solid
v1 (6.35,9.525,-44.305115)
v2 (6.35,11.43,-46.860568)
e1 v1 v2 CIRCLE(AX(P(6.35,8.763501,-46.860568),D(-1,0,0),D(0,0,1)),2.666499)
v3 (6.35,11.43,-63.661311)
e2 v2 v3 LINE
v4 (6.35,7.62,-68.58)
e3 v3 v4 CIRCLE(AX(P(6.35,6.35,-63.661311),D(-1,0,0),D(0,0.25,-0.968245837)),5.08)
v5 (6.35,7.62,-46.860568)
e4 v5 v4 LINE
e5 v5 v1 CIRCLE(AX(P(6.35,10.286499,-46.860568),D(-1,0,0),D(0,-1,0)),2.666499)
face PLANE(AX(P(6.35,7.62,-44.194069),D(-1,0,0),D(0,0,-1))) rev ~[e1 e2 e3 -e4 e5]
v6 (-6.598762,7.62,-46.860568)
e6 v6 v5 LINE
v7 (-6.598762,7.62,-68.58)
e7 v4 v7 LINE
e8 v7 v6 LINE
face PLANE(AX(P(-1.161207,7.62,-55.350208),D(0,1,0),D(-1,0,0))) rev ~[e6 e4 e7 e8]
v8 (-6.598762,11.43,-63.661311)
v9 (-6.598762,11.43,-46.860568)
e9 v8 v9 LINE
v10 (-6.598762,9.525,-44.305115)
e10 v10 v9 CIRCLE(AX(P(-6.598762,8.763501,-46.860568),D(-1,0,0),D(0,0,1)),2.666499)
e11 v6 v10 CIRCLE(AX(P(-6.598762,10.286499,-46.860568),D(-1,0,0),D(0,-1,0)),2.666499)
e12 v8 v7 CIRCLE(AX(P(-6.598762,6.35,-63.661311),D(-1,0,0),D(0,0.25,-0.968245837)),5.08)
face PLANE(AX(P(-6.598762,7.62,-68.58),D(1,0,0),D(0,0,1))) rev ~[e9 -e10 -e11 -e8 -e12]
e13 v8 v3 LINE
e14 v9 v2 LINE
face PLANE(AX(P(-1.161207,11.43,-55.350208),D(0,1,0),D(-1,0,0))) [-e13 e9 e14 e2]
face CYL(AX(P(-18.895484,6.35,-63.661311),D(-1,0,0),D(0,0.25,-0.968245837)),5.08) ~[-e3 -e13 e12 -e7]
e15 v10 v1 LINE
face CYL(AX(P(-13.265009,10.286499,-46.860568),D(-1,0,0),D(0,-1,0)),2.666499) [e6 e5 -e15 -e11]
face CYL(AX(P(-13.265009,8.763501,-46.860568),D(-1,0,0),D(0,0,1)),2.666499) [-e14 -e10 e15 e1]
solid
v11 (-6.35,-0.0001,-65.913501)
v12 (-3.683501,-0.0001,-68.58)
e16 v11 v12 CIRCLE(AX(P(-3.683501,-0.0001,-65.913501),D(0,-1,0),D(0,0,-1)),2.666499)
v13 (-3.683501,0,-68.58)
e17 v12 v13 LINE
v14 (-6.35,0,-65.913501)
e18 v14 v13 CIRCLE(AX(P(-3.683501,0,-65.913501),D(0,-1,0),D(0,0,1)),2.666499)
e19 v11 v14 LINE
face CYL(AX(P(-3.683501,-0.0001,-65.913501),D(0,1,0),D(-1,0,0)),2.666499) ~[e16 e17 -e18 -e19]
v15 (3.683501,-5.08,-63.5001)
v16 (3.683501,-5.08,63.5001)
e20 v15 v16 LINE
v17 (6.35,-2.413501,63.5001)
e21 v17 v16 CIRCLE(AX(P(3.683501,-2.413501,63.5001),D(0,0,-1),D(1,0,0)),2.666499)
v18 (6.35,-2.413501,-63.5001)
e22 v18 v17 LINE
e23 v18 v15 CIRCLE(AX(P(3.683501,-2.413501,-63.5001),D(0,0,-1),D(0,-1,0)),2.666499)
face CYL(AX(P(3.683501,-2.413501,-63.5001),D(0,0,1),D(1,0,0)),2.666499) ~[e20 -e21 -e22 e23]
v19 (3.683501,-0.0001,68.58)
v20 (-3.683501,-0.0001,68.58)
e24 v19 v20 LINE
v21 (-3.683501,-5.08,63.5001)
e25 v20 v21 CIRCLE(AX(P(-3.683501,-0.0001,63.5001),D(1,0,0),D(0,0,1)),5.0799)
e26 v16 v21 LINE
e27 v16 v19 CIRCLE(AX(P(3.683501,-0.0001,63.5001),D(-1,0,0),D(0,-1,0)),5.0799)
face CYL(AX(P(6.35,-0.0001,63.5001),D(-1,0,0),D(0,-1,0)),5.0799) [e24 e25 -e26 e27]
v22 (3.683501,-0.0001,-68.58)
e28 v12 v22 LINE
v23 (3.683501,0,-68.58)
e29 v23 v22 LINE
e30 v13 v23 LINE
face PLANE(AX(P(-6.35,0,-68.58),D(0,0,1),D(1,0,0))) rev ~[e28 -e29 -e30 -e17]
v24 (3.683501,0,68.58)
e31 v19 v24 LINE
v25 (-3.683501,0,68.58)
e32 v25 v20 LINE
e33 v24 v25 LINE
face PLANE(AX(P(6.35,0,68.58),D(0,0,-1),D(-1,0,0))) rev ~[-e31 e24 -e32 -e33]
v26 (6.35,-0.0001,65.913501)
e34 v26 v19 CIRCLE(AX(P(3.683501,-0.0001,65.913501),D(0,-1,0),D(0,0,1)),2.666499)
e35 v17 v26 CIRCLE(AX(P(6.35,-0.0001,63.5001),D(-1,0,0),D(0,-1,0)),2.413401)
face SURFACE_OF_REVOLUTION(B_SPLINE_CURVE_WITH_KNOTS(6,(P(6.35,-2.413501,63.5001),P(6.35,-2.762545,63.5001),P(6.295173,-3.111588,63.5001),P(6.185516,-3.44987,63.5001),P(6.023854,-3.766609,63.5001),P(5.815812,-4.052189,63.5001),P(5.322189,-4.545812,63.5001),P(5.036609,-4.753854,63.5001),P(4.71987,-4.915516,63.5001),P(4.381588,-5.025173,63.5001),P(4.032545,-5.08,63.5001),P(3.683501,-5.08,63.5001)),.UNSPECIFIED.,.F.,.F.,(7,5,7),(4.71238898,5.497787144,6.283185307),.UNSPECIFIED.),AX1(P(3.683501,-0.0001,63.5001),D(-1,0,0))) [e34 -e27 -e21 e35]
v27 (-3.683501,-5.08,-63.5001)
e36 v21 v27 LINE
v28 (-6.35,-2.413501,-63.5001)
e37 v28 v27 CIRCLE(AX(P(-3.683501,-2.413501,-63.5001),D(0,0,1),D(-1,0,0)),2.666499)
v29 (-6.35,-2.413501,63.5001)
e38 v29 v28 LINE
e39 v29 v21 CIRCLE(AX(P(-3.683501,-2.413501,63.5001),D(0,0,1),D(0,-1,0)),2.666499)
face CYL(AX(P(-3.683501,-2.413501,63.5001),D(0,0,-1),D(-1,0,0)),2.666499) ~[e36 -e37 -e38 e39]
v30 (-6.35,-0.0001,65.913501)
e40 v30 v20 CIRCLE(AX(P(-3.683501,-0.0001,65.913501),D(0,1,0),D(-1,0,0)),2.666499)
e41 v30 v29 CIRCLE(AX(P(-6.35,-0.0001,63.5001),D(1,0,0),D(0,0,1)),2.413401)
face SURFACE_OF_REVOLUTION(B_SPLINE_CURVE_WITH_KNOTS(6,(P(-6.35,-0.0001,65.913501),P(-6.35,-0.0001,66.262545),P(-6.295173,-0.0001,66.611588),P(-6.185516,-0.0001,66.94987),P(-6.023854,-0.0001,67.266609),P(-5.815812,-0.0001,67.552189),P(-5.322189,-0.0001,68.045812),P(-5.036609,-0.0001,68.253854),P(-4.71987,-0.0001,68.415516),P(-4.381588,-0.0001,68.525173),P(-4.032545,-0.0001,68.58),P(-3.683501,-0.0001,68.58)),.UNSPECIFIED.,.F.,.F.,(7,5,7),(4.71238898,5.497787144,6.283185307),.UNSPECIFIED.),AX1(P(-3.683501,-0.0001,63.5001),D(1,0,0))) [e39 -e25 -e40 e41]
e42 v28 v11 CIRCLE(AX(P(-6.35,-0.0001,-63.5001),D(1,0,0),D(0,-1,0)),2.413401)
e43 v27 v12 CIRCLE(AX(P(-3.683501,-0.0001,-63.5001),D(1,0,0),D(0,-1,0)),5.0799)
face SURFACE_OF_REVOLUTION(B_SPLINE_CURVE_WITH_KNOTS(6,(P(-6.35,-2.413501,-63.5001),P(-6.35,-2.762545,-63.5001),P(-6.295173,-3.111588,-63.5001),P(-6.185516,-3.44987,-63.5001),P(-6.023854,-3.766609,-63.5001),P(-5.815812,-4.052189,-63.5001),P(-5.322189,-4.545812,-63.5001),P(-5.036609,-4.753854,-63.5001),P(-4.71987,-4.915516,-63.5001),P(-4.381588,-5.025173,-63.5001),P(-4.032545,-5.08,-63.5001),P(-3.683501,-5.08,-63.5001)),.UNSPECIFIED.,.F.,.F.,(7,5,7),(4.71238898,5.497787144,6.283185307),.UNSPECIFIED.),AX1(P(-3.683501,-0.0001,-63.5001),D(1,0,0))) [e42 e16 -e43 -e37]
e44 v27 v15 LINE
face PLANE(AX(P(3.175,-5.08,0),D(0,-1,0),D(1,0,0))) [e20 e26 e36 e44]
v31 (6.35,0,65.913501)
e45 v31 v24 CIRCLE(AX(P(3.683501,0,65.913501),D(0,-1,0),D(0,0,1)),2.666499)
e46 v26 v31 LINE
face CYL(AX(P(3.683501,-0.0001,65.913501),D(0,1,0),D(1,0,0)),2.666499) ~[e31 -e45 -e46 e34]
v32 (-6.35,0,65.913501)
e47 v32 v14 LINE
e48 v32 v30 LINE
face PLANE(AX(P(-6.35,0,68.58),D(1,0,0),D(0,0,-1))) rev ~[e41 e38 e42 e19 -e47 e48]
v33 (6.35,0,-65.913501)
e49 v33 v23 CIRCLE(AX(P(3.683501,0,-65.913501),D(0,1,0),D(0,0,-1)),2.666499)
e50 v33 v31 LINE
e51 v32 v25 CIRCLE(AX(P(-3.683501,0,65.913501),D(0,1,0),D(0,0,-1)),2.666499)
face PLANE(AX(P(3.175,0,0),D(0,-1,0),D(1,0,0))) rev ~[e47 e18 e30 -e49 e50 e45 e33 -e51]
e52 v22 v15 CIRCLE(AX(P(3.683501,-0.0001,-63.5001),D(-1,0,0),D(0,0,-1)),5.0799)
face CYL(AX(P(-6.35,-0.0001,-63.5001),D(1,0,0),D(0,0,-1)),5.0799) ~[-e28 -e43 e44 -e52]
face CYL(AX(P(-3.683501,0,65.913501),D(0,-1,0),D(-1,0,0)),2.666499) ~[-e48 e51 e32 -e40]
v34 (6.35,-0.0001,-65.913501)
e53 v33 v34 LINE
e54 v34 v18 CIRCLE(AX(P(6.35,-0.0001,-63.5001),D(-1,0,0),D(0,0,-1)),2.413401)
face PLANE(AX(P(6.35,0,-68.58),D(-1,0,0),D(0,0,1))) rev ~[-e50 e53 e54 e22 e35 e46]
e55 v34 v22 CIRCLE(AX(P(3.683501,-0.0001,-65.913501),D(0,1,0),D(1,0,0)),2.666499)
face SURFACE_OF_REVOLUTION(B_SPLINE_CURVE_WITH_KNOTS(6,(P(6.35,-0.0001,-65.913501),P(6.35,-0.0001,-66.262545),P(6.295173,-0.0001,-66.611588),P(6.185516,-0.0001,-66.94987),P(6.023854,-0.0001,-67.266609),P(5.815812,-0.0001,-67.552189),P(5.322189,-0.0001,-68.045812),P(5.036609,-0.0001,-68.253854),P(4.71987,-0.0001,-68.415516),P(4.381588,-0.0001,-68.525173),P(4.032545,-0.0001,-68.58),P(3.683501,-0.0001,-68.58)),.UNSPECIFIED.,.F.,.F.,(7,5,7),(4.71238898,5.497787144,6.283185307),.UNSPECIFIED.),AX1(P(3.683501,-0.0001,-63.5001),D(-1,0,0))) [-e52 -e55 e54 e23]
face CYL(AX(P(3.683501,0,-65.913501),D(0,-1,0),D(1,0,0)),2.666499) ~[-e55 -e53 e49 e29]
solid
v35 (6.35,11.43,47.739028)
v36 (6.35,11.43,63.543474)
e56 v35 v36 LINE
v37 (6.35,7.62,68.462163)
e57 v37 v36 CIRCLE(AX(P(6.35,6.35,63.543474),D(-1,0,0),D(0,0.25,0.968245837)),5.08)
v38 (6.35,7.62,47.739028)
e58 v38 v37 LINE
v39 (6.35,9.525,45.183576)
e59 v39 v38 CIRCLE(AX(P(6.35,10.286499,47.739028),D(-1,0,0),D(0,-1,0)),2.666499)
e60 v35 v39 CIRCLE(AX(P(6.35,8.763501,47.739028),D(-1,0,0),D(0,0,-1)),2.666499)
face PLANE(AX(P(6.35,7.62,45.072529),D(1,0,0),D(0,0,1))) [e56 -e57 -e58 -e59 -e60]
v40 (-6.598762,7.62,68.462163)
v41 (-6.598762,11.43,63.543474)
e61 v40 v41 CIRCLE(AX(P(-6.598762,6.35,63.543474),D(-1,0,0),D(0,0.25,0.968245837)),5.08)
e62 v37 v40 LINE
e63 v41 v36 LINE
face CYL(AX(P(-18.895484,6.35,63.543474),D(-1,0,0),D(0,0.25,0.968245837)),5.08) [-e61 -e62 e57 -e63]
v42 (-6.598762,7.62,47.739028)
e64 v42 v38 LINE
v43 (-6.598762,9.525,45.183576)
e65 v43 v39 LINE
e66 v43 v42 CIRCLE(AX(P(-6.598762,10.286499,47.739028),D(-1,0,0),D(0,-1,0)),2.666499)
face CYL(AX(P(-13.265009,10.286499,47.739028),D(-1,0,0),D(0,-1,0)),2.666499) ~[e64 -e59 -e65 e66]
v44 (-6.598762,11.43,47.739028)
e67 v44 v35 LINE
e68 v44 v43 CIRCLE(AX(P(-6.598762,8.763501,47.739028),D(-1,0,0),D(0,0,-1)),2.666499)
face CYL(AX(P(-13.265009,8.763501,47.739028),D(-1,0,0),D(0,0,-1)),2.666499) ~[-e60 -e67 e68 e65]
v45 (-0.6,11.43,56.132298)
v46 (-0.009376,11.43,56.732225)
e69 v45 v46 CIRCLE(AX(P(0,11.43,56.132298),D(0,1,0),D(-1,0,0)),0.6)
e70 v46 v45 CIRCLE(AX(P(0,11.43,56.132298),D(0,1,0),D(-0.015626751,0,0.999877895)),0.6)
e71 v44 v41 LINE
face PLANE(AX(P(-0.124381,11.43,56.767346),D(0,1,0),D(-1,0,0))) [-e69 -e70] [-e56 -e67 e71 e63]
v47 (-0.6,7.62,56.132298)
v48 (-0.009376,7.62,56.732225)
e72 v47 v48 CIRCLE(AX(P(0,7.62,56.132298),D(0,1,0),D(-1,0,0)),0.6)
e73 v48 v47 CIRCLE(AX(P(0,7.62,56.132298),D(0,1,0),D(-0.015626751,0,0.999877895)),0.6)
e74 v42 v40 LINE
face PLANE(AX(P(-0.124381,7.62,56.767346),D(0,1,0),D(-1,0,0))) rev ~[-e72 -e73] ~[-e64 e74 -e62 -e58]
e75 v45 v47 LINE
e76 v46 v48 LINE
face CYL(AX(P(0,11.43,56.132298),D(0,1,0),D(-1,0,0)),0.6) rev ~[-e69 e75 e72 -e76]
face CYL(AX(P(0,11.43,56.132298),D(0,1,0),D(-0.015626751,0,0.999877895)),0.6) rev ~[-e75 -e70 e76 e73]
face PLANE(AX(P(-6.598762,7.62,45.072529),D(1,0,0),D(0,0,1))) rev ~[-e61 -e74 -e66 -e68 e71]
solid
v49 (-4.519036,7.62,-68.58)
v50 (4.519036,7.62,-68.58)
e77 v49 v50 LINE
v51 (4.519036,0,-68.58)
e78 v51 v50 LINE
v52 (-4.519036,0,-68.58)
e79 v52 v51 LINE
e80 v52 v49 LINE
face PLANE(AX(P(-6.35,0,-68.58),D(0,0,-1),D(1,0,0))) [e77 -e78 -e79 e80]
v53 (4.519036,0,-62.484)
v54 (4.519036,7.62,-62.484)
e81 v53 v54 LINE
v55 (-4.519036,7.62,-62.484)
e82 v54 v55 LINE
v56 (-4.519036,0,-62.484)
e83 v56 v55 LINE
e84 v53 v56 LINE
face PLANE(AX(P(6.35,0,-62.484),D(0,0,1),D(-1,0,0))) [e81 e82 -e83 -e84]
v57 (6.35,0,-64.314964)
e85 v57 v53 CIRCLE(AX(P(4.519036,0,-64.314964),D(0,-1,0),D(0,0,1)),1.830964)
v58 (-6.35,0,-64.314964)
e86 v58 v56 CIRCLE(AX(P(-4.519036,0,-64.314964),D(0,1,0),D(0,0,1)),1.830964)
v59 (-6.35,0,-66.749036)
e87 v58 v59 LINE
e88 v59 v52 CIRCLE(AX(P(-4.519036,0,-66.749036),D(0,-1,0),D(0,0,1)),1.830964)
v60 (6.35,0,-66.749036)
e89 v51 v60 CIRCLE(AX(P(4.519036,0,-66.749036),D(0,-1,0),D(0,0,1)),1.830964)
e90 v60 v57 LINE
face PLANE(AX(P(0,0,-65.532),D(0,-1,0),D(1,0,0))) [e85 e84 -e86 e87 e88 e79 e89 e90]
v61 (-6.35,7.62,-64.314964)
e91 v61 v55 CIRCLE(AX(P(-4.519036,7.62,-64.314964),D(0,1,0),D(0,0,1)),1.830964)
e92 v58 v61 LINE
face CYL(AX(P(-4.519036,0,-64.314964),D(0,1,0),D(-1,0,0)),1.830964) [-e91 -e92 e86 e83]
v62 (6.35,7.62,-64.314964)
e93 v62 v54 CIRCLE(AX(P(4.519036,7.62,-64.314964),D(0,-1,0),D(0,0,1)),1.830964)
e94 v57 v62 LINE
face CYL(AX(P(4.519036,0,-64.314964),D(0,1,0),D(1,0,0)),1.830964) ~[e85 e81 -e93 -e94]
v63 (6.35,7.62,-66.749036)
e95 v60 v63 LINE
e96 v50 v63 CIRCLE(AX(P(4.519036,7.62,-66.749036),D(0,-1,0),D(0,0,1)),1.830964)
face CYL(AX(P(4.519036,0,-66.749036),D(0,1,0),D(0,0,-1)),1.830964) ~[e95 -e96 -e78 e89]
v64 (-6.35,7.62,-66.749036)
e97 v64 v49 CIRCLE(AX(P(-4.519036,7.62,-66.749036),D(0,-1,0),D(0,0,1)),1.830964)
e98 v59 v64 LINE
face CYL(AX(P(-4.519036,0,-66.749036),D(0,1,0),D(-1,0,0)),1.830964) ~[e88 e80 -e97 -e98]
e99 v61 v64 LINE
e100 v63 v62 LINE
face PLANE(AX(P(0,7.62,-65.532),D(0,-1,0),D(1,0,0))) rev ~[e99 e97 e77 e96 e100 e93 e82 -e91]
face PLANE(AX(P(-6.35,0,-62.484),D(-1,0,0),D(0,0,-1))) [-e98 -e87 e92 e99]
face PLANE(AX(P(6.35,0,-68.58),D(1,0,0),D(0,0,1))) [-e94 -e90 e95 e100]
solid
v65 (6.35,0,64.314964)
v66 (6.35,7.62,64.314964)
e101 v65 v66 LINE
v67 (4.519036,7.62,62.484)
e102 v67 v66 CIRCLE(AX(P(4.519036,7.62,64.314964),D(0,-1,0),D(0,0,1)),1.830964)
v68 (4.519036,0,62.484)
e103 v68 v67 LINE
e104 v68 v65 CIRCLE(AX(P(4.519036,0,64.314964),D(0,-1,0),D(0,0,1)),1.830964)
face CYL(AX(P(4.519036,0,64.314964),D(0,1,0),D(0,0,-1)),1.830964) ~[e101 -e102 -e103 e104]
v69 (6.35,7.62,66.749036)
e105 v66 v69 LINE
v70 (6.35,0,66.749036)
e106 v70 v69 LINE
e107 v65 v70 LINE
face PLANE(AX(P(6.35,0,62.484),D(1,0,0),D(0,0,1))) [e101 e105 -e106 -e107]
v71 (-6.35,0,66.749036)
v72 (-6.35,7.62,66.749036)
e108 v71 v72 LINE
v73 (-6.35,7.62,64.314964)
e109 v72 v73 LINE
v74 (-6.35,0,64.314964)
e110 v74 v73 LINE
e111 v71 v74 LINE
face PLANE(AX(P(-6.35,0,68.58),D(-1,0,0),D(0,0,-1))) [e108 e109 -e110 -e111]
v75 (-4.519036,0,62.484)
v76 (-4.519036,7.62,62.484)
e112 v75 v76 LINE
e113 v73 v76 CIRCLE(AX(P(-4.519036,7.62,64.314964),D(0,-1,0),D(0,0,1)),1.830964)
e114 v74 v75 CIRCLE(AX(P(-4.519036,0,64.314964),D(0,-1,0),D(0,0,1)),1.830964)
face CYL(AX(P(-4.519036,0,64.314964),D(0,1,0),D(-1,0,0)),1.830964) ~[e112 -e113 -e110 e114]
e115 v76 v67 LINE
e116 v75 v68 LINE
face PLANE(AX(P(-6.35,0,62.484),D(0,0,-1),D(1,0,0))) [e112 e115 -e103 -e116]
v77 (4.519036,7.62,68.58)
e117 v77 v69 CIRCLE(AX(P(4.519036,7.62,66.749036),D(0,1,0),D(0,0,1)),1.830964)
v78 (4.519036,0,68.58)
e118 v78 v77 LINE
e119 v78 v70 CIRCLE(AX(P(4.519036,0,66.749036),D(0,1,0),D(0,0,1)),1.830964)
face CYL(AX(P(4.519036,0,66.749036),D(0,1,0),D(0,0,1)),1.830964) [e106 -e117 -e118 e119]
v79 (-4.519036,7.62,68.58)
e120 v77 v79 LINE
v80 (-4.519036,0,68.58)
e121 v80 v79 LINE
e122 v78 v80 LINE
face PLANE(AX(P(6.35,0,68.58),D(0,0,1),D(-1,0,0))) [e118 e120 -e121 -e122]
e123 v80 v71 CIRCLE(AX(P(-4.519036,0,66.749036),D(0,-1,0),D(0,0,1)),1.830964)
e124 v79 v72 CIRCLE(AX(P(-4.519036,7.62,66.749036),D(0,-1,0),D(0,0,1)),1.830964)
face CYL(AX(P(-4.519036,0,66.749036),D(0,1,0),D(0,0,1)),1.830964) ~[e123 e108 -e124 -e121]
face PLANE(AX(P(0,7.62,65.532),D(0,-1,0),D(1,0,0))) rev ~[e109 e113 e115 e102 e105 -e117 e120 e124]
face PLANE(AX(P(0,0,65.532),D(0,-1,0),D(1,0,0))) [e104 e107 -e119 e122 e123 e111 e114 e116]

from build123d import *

# Parameters (mm, degrees)
F1_DEPTH      = 7.62
F0_W          = 6.35
F0_H          = 124.968
F2_DEPTH      = 5.08
F3_W          = 12.7
F3_H          = 6.096
F4_DEPTH      = 3.81
F3_W_2        = 12.9487617709
F3_H_2        = 23.389633745
F6_DEPTH      = 25.4
F7_F1_R       = 5.0799
F7_F2_R       = 5.0799
F7_2_T1_DEPTH = 37.5422060193
F7_3_T1_DEPTH = 37.5422060193
F8_F1_R       = 2.6664988796
F8_F2_R       = 2.6664988796
F8_2_T1_DEPTH = 26.2812561691
F8_3_T1_DEPTH = 26.2812561691
F9_R          = 1.8309637078
F9_2_R        = 1.8309637078


# Not quite as in the source:
# - a fillet or chamfer that OpenCascade refuses, or shapes differently, is made with other operations: its cross-section is extruded or revolved along the edge and cut away or added
# - a fillet or chamfer is up to 0.001 mm smaller than in the source, because OpenCascade refuses the exact size


with BuildPart() as f1:
    # F0 (on Front) → F1 (new body)
    with BuildSketch(Plane.XZ):
        Polygon((0, -62.484), (-6.35, -62.484), (-6.35, -68.58), (6.35, -68.58), (6.35, -62.484), align=None)
    extrude(amount=-F1_DEPTH)

    # F9
    f9_edges = [f1.edges().sort_by_distance(p)[0] for p in [
        (6.35, 3.81, -68.58),
        (6.35, 3.81, -62.484),
        (-6.35, 3.81, -62.484),
        (-6.35, 3.81, -68.58),
    ]]
    fillet(f9_edges, radius=F9_R)


with BuildPart() as f1b:
    # F0 (on Front) → F1, piece 2 (new body)
    with BuildSketch(Plane.XZ):
        Polygon((6.35, 68.58), (-6.35, 68.58), (-6.35, 62.484), (0, 62.484), (6.35, 62.484), align=None)
    extrude(amount=-F1_DEPTH)

    # F9#2
    f9_2_edges = [f1b.edges().sort_by_distance(p)[0] for p in [
        (6.35, 3.81, 68.58),
        (-6.35, 3.81, 68.58),
        (6.35, 3.81, 62.484),
        (-6.35, 3.81, 62.484),
    ]]
    fillet(f9_2_edges, radius=F9_2_R)


with BuildPart() as f2:
    # F0 (on Front) → F2 (new body)
    with BuildSketch(Plane.XZ):
        with Locations((3.175, 0)):
            Rectangle(F0_W, F0_H)
        with Locations((-3.175, 0)):
            Rectangle(F0_W, F0_H)
        Polygon((0, -62.484), (-6.35, -62.484), (-6.35, -68.58), (6.35, -68.58), (6.35, -62.484), align=None)
        Polygon((6.35, 68.58), (-6.35, 68.58), (-6.35, 62.484), (0, 62.484), (6.35, 62.484), align=None)
    extrude(amount=F2_DEPTH)

    # F7: fillet of radius 5.08 on 2 edges, made by hand

    # F7_f1 (radius 5.08 in the source; OpenCascade refuses exactly that, so slightly less here)
    f7_f1_edges = [f2.edges().sort_by_distance(p)[0] for p in [
        (0, -5.08, -68.58),
    ]]
    fillet(f7_f1_edges, radius=F7_F1_R)

    # F7_f2 (radius 5.08 in the source; OpenCascade refuses exactly that, so slightly less here)
    f7_f2_edges = [f2.edges().sort_by_distance(p)[0] for p in [
        (0, -5.08, 68.58),
    ]]
    fillet(f7_f2_edges, radius=F7_F2_R)

    # F8: fillet of radius 2.6664988796 on 10 edges, made by hand

    # F8_f1
    f8_f1_edges = [f2.edges().sort_by_distance(p)[0] for p in [
        (-6.35, -5.08, 0),
        (-6.35, -3.5921317377, 67.0921317377),
        (-6.35, -3.5921317377, -67.0921317377),
        (-6.35, -5e-05, 68.58),
        (-6.35, -5e-05, -68.58),
    ]]
    fillet(f8_f1_edges, radius=F8_F1_R)

    # F8_f2
    f8_f2_edges = [f2.edges().sort_by_distance(p)[0] for p in [
        (6.35, -5.08, 0),
        (6.35, -3.5921317377, 67.0921317377),
        (6.35, -3.5921317377, -67.0921317377),
        (6.35, -5e-05, 68.58),
        (6.35, -5e-05, -68.58),
    ]]
    fillet(f8_f2_edges, radius=F8_F2_R)


with BuildPart() as f4:
    # F3 (on face) → F4 (new body)
    with BuildSketch(Plane(origin=(0, 7.62, 0), x_dir=(-1, 0, 0), z_dir=(0, 1, 0))):
        Polygon((6.35, -62.484), (6.35, -68.58), (6.5987617709, -68.58), (6.5987617709, -44.1940687597), (-6.35, -44.1940687597), (-6.35, -62.484), align=None)
        with Locations((0, -65.532)):
            Rectangle(F3_W, F3_H)
    extrude(amount=F4_DEPTH)

    # F7#2: fillet of radius 5.08 on 1 edges, made by hand

    # F7_2_s2 → F7_2_t1 (cut)
    with BuildSketch(Plane.YZ.offset(-18.8954838951)):
        with BuildLine():
            ThreePointArc((7.62, -68.58), (10.3660926284, -66.7721631237), (11.43, -63.6613111503))
            Line((11.43, -63.6613111503), (11.43, -68.58))
            Line((11.43, -68.58), (7.62, -68.58))
        make_face()
    extrude(amount=F7_2_T1_DEPTH, mode=Mode.SUBTRACT)

    # F8#2: fillet of radius 2.6664988796 on 2 edges, made by hand

    # F8_2_s2 → F8_2_t1 (cut)
    with BuildSketch(Plane.YZ.offset(-13.26500897)):
        with BuildLine():
            ThreePointArc((8.7635011204, -44.1940687597), (10.6490005602, -44.9750681995), (11.43, -46.8605676393))
            Line((11.43, -46.8605676393), (11.43, -44.1940687597))
            Line((11.43, -44.1940687597), (8.7635011204, -44.1940687597))
        make_face()
        with BuildLine():
            ThreePointArc((7.62, -46.8605676393), (8.4009994398, -44.9750681995), (10.2864988796, -44.1940687597))
            Line((10.2864988796, -44.1940687597), (7.62, -44.1940687597))
            Line((7.62, -44.1940687597), (7.62, -46.8605676393))
        make_face()
    extrude(amount=F8_2_T1_DEPTH, mode=Mode.SUBTRACT)


with BuildPart() as f4b:
    # F3 (on face) → F4, piece 2 (new body)
    with BuildSketch(Plane(origin=(0, 7.62, 0), x_dir=(-1, 0, 0), z_dir=(0, 1, 0))):
        with Locations((0.1243808854, 56.7673463374)):
            Rectangle(F3_W_2, F3_H_2)
    extrude(amount=F4_DEPTH)

    # F5 (on face) → F6 (cut)
    with BuildSketch(Plane(origin=(0, 11.43, 0), x_dir=(-1, 0, 0), z_dir=(0, 1, 0))):
        with BuildLine():
            ThreePointArc((0.0093760507, 56.7322248993), (-0.427566153, 55.7113620808), (0.6, 56.1322981624))
            ThreePointArc((0.6, 56.1322981624), (0.427566153, 56.553234244), (0.0093760507, 56.7322248993))
        make_face()
    extrude(amount=-F6_DEPTH, mode=Mode.SUBTRACT)

    # F7#3: fillet of radius 5.08 on 1 edges, made by hand

    # F7_3_s2 → F7_3_t1 (cut)
    with BuildSketch(Plane.YZ.offset(-18.8954838951)):
        with BuildLine():
            ThreePointArc((7.62, 68.4621632099), (10.3660926284, 66.6543263336), (11.43, 63.5434743602))
            Line((11.43, 63.5434743602), (11.43, 68.4621632099))
            Line((11.43, 68.4621632099), (7.62, 68.4621632099))
        make_face()
    extrude(amount=F7_3_T1_DEPTH, mode=Mode.SUBTRACT)

    # F8#3: fillet of radius 2.6664988796 on 2 edges, made by hand

    # F8_3_s2 → F8_3_t1 (cut)
    with BuildSketch(Plane.YZ.offset(-13.26500897)):
        with BuildLine():
            ThreePointArc((8.7635011204, 45.072529465), (10.6490005602, 45.8535289048), (11.43, 47.7390283446))
            Line((11.43, 47.7390283446), (11.43, 45.072529465))
            Line((11.43, 45.072529465), (8.7635011204, 45.072529465))
        make_face()
        with BuildLine():
            ThreePointArc((7.62, 47.7390283446), (8.4009994398, 45.8535289048), (10.2864988796, 45.072529465))
            Line((10.2864988796, 45.072529465), (7.62, 45.072529465))
            Line((7.62, 45.072529465), (7.62, 47.7390283446))
        make_face()
    extrude(amount=F8_3_T1_DEPTH, mode=Mode.SUBTRACT)


solid = Compound([f1.part, f1b.part, f2.part, f4.part, f4b.part])
